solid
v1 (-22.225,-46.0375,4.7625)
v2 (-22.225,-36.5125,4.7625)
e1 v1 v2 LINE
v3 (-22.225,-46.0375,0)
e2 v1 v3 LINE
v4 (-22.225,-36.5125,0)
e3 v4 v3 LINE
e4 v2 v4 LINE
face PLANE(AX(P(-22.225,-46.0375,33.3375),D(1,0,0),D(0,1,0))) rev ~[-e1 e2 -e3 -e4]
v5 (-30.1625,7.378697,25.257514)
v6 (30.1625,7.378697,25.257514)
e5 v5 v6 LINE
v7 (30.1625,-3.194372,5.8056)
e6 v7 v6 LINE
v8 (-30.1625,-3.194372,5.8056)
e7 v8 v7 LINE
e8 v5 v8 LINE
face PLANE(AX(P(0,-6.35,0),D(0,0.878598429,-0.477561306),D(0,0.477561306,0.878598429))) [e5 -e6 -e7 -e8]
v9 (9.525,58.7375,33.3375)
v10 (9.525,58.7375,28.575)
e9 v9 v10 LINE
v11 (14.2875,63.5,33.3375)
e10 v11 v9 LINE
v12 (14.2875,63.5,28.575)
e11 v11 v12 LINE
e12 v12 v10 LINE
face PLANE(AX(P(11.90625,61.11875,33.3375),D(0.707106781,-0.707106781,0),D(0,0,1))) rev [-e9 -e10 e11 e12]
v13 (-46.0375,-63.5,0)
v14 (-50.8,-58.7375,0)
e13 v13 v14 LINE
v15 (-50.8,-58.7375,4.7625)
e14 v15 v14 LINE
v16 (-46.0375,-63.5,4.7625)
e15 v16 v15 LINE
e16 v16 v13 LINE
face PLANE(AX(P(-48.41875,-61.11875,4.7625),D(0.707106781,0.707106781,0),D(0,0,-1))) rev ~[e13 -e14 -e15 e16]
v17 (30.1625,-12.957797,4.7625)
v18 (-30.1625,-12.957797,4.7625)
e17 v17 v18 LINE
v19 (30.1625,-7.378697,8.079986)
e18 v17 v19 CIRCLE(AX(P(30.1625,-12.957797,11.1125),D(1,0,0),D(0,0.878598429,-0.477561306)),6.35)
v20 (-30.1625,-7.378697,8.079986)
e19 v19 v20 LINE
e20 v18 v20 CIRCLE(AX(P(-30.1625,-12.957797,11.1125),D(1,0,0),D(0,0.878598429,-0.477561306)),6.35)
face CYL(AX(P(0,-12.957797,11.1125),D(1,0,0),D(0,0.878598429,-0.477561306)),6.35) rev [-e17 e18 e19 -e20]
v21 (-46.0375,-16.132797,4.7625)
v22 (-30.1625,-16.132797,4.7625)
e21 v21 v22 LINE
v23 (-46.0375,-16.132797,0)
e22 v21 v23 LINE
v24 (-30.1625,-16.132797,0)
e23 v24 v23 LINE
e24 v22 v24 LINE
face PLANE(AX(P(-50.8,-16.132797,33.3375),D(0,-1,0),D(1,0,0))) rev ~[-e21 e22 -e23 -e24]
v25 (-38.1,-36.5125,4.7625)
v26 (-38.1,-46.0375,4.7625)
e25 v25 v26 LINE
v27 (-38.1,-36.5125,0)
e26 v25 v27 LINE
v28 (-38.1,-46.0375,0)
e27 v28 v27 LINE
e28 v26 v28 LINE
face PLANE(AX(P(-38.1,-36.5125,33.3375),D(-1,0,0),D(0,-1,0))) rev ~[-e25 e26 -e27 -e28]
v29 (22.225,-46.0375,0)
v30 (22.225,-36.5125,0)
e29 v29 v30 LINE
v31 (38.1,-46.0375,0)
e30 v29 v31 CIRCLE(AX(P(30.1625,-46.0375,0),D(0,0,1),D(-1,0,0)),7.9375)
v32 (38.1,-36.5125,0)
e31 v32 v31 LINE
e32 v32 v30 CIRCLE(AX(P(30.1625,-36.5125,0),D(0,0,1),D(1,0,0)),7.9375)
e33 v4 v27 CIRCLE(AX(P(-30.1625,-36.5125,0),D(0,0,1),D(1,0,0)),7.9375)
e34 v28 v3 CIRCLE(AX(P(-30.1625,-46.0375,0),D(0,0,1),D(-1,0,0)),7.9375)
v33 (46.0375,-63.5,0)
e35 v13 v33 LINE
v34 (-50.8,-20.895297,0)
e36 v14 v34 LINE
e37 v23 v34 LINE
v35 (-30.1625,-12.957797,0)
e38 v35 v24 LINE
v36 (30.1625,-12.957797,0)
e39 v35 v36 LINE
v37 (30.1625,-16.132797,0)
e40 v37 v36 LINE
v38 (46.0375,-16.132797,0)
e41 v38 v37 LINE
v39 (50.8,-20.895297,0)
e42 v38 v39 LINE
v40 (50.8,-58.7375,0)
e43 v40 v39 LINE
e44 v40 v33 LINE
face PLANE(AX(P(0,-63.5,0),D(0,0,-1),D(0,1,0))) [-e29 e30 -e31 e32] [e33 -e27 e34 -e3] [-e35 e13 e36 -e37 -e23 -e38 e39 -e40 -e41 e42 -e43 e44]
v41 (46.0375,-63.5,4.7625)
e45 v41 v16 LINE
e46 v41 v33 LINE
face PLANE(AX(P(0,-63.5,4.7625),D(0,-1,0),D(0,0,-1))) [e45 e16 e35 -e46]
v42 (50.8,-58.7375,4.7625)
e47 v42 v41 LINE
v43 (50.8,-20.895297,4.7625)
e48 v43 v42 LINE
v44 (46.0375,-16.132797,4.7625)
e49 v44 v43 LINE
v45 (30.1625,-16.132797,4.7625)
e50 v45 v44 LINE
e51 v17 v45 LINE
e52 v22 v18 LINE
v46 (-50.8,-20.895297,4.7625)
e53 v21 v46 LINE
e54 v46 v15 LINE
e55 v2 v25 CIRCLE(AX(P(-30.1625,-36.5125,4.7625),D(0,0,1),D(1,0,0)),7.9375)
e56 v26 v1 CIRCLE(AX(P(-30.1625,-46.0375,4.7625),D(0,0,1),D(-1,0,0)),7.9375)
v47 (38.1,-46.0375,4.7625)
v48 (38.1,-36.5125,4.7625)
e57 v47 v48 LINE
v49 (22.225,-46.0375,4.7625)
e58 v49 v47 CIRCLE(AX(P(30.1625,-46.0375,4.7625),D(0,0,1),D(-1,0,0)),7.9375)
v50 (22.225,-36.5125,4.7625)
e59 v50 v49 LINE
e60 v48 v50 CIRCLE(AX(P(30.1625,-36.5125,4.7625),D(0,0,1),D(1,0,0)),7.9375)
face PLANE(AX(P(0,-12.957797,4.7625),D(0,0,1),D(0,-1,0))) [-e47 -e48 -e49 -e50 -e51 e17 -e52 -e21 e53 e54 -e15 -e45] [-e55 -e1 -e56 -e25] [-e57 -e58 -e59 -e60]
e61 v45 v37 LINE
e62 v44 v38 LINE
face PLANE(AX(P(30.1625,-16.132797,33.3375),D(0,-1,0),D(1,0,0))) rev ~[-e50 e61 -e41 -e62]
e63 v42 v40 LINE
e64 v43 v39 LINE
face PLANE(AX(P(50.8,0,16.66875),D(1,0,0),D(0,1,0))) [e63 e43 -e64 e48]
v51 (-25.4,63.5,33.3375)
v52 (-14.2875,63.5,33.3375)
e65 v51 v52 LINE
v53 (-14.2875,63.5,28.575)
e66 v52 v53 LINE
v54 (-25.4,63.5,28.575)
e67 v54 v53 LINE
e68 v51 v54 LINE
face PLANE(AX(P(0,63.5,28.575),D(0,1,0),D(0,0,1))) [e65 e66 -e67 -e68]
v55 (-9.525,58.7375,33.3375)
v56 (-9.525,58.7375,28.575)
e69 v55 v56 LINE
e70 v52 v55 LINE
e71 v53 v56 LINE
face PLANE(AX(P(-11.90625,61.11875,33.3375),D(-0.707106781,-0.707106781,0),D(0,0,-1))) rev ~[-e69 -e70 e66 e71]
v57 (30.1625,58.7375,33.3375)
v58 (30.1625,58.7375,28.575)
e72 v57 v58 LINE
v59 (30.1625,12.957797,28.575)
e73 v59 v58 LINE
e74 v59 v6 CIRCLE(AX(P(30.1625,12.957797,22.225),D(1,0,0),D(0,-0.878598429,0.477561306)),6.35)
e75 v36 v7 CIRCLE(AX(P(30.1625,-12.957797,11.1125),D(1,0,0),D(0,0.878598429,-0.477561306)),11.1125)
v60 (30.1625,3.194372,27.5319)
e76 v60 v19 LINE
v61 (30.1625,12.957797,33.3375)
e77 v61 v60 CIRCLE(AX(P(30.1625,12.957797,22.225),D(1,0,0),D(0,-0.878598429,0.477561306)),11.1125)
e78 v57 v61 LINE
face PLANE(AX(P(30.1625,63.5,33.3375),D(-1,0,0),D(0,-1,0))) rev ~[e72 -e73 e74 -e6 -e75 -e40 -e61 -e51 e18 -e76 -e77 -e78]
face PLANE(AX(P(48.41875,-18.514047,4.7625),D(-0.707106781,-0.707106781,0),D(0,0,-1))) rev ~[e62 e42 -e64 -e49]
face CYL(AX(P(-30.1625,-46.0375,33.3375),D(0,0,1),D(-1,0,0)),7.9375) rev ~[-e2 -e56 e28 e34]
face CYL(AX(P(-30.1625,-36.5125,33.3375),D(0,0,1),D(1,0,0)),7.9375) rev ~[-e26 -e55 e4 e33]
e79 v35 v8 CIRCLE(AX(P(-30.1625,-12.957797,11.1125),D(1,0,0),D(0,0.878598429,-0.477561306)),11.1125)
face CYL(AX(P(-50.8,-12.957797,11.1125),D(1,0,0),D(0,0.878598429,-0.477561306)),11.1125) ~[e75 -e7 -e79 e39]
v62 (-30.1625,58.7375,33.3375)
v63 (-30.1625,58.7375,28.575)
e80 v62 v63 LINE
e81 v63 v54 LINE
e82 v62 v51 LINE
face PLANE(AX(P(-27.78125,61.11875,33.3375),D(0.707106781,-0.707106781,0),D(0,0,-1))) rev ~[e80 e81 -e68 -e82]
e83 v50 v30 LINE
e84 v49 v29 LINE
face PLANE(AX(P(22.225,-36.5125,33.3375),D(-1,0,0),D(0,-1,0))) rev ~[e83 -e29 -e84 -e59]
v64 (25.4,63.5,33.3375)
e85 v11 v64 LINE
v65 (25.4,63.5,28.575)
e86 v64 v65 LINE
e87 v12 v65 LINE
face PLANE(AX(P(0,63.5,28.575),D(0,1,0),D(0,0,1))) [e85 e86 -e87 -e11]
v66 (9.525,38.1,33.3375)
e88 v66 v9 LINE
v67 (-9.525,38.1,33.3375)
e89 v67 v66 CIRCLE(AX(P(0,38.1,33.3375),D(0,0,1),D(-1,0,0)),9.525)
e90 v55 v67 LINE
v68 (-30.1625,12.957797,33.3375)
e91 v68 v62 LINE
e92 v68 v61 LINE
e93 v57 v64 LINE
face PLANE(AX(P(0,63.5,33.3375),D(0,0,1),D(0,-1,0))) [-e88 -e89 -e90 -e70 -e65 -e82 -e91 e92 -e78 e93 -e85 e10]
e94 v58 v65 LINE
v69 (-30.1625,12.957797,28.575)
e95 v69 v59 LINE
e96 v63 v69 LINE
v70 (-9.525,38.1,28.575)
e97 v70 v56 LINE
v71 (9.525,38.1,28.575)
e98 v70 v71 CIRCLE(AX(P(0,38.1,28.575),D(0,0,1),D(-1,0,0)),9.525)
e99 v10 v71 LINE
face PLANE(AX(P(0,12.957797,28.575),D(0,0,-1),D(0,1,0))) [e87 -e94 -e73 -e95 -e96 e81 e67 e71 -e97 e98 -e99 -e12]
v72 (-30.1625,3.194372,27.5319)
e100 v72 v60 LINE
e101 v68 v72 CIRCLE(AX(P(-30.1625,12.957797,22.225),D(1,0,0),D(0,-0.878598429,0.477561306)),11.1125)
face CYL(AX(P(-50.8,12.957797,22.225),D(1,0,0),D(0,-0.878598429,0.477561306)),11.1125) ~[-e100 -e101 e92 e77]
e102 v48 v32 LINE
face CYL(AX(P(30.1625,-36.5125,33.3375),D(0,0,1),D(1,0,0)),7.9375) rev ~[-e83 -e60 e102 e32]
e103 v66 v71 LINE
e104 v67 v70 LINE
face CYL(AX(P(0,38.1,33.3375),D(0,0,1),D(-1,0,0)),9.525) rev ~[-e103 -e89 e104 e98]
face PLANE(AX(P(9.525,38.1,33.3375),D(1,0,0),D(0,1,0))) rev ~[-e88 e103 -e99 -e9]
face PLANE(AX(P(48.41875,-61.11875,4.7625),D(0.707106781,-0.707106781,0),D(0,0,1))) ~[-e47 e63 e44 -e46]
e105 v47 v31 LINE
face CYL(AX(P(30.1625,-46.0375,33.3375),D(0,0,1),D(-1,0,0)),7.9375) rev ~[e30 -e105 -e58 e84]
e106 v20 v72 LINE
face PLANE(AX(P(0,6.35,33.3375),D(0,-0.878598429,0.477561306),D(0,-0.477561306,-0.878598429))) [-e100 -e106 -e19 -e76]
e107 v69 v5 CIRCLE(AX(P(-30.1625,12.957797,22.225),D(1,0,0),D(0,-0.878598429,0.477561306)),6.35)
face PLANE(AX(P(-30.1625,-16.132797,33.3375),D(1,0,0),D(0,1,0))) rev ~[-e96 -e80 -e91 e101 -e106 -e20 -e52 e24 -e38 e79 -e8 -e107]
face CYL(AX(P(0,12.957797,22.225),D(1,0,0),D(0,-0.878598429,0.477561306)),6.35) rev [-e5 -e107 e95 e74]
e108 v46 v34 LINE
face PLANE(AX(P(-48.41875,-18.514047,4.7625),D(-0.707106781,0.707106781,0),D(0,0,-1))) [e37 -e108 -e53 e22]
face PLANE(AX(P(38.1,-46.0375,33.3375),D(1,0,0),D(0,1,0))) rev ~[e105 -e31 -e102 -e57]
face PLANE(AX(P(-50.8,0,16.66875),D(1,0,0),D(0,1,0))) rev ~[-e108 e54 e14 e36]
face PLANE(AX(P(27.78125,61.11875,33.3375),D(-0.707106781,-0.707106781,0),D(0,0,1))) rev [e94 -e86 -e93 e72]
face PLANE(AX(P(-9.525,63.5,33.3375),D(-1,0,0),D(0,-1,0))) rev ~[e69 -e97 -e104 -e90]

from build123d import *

# Parameters (mm, degrees)
F1_DEPTH = 50.8
F2_R     = 11.1125
F3_W     = 20.6375
F3_H     = 29.0905938273
F3_H_2   = 50.5422030863
F4_DEPTH = 33.3385
F5_SIZE  = 4.7625


with BuildPart() as f1:
    # F0 (on Right) → F1 (new body, symmetric)
    with BuildSketch(Plane.YZ):
        with BuildLine():
            Line((-63.5, 4.7625), (-63.5, 0))
            Line((-63.5, 0), (-6.35, 0))
            Line((-6.35, 0), (7.3786968916, 25.2575142941))
            ThreePointArc((7.3786968916, 25.2575142941), (9.7123359116, 27.6829742473), (12.9577969137, 28.575))
            Line((12.9577969137, 28.575), (63.5, 28.575))
            Line((63.5, 28.575), (63.5, 33.3375))
            Line((63.5, 33.3375), (6.35, 33.3375))
            Line((6.35, 33.3375), (-7.3786968916, 8.0799857059))
            ThreePointArc((-7.3786968916, 8.0799857059), (-9.7123359116, 5.6545257527), (-12.9577969137, 4.7625))
            Line((-12.9577969137, 4.7625), (-63.5, 4.7625))
        make_face()
    extrude(amount=F1_DEPTH, both=True)

    # F2
    f2_edges = [f1.edges().sort_by_distance(p)[0] for p in [
        (0, 6.35, 33.3375),
        (0, -6.35, 0),
    ]]
    fillet(f2_edges, radius=F2_R)

    # F3 (on face) → F4 (cut, through all)
    with BuildSketch(Plane.XY.offset(33.3375)):
        with BuildLine():
            Line((-38.1, -36.5125), (-38.1, -46.0375))
            ThreePointArc((-38.1, -46.0375), (-30.1625, -53.975), (-22.225, -46.0375))
            Line((-22.225, -46.0375), (-22.225, -36.5125))
            ThreePointArc((-22.225, -36.5125), (-30.1625, -28.575), (-38.1, -36.5125))
        make_face()
        with BuildLine():
            ThreePointArc((38.1, -36.5125), (30.1625, -28.575), (22.225, -36.5125))
            Line((22.225, -36.5125), (22.225, -46.0375))
            ThreePointArc((22.225, -46.0375), (30.1625, -53.975), (38.1, -46.0375))
            Line((38.1, -46.0375), (38.1, -36.5125))
        make_face()
        with Locations((-40.48125, -1.5875)):
            Rectangle(F3_W, F3_H)
        with Locations((40.48125, -1.5875)):
            Rectangle(F3_W, F3_H)
        with BuildLine():
            ThreePointArc((9.525, 38.1), (0, 47.625), (-9.525, 38.1))
            ThreePointArc((-9.525, 38.1), (0, 28.575), (9.525, 38.1))
        make_face()
        with BuildLine():
            Line((9.525, 63.5), (-9.525, 63.5))
            Line((-9.525, 63.5), (-9.525, 38.1))
            ThreePointArc((-9.525, 38.1), (0, 47.625), (9.525, 38.1))
            Line((9.525, 38.1), (9.525, 63.5))
        make_face()
        with Locations((-40.48125, 38.2288984568)):
            Rectangle(F3_W, F3_H_2)
        with Locations((40.48125, 38.2288984568)):
            Rectangle(F3_W, F3_H_2)
    extrude(amount=-F4_DEPTH, mode=Mode.SUBTRACT)

    # F5
    f5_edges = [f1.edges().sort_by_distance(p)[0] for p in [
        (50.8, -63.5, 2.38125),
        (50.8, -16.132797, 2.38125),
        (-50.8, -63.5, 2.38125),
        (-50.8, -16.132797, 2.38125),
        (30.1625, 63.5, 30.95625),
        (-30.1625, 63.5, 30.95625),
        (9.525, 63.5, 30.95625),
        (-9.525, 63.5, 30.95625),
    ]]
    chamfer(f5_edges, length=F5_SIZE)


solid = f1.part
